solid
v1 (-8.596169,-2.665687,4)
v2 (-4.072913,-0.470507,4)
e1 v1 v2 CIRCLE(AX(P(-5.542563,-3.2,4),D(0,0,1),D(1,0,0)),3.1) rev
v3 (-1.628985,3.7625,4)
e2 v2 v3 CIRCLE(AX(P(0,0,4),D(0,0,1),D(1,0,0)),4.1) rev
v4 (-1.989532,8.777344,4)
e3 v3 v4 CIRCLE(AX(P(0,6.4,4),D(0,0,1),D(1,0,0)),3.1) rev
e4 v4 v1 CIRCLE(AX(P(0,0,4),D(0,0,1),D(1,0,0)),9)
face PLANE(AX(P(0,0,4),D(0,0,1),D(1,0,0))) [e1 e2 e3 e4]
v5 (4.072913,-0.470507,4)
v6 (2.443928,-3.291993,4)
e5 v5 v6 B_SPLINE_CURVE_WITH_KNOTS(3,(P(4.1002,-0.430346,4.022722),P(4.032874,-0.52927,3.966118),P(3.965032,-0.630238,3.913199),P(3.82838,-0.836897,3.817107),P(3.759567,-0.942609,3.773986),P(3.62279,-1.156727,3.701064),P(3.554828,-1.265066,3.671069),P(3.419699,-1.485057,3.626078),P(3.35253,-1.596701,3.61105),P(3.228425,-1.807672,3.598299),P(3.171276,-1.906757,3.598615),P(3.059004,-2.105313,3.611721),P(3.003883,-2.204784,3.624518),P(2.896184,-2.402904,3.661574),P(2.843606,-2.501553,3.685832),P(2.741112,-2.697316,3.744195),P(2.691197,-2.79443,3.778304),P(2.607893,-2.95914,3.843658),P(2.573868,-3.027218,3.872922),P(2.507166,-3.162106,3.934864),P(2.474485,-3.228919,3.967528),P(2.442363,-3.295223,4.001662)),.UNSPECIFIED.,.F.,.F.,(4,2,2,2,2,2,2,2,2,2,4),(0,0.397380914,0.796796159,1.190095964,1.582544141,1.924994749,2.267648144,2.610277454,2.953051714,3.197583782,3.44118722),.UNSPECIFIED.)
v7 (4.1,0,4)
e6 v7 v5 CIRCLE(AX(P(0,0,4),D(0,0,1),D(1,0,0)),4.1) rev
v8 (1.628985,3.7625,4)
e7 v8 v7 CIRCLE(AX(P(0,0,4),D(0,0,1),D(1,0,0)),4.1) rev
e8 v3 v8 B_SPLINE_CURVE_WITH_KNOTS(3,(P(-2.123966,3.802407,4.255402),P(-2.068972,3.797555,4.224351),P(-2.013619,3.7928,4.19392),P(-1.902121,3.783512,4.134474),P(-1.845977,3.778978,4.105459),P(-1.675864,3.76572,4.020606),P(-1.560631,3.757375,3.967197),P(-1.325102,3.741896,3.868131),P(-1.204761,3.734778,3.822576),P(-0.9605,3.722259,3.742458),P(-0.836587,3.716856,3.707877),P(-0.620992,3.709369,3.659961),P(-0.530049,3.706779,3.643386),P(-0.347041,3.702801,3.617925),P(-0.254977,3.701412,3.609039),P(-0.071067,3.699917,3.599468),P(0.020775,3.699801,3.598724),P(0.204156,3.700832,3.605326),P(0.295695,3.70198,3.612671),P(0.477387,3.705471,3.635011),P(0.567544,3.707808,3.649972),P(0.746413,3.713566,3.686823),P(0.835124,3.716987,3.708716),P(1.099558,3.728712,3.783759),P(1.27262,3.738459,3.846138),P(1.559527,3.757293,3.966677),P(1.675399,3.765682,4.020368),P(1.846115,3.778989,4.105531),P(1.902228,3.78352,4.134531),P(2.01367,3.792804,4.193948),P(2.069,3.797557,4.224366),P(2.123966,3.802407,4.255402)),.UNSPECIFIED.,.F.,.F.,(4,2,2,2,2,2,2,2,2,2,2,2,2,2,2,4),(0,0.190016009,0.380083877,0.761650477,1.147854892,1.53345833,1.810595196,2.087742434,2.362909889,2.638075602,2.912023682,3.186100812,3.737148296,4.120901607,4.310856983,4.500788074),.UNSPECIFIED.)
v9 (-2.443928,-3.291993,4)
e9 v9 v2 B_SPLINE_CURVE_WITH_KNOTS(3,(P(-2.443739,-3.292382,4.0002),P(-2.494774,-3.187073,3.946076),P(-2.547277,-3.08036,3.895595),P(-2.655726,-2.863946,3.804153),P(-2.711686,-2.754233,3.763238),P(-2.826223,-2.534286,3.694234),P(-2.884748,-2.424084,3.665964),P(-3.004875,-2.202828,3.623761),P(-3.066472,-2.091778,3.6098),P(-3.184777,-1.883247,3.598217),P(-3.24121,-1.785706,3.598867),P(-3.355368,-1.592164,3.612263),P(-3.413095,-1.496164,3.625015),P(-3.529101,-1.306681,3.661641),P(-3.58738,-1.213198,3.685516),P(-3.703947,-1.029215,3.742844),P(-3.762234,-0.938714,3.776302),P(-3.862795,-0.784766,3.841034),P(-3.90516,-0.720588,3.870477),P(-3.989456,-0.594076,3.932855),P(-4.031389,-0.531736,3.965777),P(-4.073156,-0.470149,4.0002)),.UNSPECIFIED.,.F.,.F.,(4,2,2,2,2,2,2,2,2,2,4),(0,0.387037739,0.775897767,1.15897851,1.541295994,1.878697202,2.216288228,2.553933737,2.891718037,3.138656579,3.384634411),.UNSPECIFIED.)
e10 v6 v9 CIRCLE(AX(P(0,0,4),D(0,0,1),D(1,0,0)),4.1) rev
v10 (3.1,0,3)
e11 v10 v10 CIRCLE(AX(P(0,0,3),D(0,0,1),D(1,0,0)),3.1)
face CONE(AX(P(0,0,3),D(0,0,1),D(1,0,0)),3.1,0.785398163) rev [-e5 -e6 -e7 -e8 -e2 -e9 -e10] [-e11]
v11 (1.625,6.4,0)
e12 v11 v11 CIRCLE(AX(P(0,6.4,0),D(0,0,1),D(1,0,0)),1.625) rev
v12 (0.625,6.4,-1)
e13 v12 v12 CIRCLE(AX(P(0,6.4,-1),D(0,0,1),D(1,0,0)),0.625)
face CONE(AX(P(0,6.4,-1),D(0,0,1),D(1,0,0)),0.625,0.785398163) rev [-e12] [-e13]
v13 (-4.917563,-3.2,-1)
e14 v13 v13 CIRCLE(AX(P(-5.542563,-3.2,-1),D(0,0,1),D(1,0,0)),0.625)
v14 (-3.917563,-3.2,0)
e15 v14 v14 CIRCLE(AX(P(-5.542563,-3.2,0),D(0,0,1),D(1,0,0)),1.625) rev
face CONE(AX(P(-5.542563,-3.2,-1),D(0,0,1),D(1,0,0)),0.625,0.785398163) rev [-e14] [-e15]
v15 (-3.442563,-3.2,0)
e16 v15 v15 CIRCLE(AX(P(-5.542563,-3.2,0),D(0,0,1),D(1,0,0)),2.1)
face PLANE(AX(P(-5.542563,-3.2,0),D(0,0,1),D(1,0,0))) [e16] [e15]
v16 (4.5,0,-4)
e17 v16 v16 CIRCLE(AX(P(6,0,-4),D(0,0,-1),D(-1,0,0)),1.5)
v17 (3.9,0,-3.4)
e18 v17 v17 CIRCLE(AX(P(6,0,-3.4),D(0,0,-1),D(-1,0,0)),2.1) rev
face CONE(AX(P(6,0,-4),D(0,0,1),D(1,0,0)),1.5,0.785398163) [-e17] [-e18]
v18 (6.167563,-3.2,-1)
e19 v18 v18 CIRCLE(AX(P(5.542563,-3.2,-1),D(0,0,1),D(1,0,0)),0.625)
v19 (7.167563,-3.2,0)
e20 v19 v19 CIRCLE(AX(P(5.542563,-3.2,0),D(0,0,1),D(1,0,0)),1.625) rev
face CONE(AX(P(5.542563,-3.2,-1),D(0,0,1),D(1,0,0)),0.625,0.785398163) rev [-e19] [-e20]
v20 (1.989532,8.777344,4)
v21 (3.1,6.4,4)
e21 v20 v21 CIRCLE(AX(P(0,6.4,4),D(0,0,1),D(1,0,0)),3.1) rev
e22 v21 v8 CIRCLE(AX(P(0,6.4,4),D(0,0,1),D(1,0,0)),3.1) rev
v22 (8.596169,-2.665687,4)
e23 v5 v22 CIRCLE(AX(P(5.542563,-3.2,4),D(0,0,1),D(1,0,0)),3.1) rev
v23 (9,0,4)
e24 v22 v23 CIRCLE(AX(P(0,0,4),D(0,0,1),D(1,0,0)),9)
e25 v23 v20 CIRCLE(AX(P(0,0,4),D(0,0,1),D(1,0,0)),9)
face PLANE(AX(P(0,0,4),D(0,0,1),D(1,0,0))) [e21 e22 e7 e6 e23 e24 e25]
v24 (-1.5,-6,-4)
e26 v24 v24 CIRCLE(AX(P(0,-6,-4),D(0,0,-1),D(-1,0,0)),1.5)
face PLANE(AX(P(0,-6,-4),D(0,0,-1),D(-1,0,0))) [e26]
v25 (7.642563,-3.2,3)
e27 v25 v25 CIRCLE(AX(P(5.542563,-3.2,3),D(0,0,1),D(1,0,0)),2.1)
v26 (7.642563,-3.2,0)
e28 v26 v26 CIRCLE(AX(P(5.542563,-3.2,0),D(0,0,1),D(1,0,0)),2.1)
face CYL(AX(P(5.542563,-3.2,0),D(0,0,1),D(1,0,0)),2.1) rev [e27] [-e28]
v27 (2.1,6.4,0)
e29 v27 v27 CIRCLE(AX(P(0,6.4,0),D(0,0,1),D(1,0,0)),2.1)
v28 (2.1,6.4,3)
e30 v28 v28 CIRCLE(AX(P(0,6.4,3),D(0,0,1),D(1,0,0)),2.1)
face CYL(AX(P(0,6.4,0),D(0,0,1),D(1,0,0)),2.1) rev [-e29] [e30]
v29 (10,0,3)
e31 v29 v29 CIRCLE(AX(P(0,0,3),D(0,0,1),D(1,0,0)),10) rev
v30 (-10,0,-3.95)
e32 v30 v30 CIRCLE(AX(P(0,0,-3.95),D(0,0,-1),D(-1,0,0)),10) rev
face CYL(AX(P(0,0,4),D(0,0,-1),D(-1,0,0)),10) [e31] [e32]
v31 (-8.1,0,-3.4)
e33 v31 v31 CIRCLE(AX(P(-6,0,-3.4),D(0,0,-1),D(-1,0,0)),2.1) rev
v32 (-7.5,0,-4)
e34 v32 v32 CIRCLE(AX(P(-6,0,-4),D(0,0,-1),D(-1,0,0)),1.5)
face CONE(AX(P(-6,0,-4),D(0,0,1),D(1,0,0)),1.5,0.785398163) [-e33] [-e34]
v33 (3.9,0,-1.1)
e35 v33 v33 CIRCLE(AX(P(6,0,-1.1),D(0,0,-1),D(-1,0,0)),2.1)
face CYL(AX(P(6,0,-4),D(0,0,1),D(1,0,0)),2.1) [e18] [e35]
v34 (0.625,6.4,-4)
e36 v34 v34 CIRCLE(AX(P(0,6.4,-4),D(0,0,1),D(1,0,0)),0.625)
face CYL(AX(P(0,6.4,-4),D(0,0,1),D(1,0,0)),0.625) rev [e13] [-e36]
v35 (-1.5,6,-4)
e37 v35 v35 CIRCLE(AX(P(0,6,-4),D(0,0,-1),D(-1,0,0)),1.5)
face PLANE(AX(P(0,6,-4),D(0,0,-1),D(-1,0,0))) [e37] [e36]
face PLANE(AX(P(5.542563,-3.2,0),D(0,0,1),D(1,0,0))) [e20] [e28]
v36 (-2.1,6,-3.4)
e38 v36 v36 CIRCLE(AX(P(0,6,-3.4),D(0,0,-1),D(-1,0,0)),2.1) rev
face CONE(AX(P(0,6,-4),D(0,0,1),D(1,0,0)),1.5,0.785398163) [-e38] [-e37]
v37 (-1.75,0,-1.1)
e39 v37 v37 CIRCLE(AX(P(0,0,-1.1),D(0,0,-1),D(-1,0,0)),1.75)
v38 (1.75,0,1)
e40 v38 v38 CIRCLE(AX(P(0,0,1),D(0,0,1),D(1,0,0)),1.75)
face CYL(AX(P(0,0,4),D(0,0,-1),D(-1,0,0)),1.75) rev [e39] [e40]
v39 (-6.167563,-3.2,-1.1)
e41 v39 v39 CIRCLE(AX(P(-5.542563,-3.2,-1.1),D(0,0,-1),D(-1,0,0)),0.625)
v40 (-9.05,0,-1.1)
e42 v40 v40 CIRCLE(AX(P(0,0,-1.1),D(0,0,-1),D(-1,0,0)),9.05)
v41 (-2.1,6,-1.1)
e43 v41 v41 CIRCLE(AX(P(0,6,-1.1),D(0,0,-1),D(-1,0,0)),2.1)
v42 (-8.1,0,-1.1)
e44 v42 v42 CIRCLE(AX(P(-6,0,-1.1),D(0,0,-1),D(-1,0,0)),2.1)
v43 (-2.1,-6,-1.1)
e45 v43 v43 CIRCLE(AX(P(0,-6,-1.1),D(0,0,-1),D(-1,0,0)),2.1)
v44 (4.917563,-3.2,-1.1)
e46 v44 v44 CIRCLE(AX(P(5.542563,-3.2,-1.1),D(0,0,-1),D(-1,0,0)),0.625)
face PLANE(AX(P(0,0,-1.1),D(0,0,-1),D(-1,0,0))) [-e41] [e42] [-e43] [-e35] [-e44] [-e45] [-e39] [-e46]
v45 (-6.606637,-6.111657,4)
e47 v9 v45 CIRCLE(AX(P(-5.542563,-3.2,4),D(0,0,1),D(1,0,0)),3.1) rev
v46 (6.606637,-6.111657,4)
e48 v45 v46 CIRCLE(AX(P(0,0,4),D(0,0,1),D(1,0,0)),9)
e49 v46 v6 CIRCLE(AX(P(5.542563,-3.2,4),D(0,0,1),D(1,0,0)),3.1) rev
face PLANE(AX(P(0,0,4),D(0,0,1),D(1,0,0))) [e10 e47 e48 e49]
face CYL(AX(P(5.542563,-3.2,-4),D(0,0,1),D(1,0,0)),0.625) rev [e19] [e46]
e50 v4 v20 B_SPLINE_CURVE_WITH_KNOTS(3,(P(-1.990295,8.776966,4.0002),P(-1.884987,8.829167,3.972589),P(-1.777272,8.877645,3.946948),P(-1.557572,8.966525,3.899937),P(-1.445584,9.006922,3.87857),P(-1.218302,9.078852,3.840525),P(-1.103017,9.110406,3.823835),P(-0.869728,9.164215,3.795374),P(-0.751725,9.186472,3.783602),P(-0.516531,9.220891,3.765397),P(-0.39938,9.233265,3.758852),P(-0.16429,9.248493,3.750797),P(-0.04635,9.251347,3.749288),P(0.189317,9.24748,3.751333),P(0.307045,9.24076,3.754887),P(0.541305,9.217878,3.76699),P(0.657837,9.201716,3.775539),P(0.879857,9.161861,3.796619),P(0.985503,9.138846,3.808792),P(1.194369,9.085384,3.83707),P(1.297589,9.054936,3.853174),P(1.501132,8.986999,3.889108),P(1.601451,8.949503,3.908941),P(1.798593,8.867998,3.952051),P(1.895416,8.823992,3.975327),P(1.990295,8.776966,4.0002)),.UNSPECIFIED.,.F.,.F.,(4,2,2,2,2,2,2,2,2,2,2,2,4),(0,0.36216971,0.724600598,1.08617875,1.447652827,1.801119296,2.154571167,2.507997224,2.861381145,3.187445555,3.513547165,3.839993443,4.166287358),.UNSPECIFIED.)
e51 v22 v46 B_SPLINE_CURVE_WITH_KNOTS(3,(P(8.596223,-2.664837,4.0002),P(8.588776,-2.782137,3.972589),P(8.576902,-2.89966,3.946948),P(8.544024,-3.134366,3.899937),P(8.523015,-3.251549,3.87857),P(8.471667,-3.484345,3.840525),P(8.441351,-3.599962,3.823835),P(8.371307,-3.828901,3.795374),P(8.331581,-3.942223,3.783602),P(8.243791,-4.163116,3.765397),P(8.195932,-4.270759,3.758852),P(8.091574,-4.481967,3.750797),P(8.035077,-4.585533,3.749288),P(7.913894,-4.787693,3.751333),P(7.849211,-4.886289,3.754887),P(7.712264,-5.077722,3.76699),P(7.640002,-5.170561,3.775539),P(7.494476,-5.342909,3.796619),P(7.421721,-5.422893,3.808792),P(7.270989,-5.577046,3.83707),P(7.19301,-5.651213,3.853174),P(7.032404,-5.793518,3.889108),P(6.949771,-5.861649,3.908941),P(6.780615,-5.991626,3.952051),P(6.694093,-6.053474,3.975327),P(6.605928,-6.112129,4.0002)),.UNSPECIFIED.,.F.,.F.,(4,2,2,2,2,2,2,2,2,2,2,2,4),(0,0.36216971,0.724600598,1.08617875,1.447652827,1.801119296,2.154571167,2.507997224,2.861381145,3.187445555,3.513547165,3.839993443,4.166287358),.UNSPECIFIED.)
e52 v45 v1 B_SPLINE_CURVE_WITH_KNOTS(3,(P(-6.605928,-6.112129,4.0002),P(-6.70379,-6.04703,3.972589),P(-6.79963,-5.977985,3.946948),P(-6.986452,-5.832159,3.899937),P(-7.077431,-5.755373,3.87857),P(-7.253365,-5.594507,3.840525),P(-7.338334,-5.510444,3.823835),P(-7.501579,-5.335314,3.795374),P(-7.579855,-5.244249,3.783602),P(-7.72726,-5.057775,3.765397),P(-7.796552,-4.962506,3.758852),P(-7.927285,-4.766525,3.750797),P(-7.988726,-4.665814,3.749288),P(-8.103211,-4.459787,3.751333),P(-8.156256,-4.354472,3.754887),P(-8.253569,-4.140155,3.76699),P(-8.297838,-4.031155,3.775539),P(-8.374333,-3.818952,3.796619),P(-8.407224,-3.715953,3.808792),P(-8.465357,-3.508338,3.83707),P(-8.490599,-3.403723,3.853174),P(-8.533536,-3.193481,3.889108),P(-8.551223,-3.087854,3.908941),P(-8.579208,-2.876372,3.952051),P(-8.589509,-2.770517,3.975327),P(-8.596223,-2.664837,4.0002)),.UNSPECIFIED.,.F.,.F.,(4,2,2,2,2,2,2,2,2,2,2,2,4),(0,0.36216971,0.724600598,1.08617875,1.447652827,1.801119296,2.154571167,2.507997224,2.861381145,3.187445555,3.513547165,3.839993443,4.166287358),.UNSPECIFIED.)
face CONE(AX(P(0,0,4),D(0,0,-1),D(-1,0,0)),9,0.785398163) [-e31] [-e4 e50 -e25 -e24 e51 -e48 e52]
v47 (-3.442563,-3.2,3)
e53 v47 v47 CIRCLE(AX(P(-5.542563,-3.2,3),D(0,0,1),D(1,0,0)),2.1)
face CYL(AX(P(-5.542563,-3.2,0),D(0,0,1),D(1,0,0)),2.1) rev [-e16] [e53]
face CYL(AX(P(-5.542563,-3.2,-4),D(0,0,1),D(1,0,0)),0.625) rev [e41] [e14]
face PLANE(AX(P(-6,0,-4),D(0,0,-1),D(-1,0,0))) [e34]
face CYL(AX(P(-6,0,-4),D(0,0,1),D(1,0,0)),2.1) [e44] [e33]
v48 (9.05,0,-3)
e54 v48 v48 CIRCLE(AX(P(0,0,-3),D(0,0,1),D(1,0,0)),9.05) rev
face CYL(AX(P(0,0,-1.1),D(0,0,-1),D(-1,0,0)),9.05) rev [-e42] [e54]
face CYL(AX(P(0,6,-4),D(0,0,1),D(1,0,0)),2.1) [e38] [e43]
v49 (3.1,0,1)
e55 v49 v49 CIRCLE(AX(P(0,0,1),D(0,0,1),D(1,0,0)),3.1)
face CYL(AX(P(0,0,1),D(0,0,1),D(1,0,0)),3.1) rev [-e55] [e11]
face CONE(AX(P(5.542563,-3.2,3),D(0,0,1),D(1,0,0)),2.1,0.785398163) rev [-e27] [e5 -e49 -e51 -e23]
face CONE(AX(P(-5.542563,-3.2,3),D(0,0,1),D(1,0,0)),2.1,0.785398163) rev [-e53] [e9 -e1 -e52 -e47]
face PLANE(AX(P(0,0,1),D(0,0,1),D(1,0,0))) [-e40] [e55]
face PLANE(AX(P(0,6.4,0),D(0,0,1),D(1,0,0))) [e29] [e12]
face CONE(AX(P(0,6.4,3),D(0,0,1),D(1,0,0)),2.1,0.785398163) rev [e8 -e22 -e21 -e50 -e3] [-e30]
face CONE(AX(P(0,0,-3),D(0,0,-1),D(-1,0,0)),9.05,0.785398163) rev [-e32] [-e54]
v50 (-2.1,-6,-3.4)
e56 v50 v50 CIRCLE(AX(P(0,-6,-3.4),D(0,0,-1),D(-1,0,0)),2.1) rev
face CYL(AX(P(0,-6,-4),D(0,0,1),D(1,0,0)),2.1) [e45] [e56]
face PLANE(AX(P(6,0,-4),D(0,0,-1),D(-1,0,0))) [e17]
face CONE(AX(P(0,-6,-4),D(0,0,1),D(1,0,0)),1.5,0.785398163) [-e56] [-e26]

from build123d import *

# Parameters (mm, degrees)
SKETCH1_R                = 10
SKETCH1_R_2              = 2.1
SKETCH1_R_3              = 1.75
BOSS_EXTRUDE1_DEPTH      = 4
SKETCH2_R                = 9.05
CUT_EXTRUDE1_DEPTH       = 2.9
CHAMFER1_SIZE            = 1
BOSS_EXTRUDE2_DEPTH      = 2.9
BOSS_EXTRUDE2_DEPTH_BACK = 5.1
SKETCH3_R                = 2.1
CHAMFER2_SIZE            = 0.6
SKETCH4_R                = 3.1
CUT_EXTRUDE2_DEPTH       = 3
SKETCH5_R                = 2.1
CUT_EXTRUDE3_DEPTH       = 4
SKETCH6_R                = 0.625
CUT_EXTRUDE4_DEPTH       = 15.696938457
CIRPATTERN1_COUNT        = 3
CHAMFER3_SIZE            = 1
CHAMFER4_SIZE            = 1


with BuildPart() as part:
    # Sketch1 → Boss-Extrude1 (new, symmetric)
    with BuildSketch(Plane.XY):
        Circle(SKETCH1_R)
        with Locations((6, 0)):
            Circle(SKETCH1_R_2, mode=Mode.SUBTRACT)
        Circle(SKETCH1_R_3, mode=Mode.SUBTRACT)
        with Locations((0, -6)):
            Circle(SKETCH1_R_2, mode=Mode.SUBTRACT)
        with Locations((-6, 0)):
            Circle(SKETCH1_R_2, mode=Mode.SUBTRACT)
        with Locations((0, 6)):
            Circle(SKETCH1_R_2, mode=Mode.SUBTRACT)
    extrude(amount=BOSS_EXTRUDE1_DEPTH, both=True)

    # Sketch2 → Cut-Extrude1 (cut)
    with BuildSketch(Plane(origin=(0, 0, -4), x_dir=(-1, 0, 0), z_dir=(0, 0, -1))):
        Circle(SKETCH2_R)
    extrude(amount=-CUT_EXTRUDE1_DEPTH, mode=Mode.SUBTRACT)

    # Chamfer1
    # the kernel refuses this chamfer: 1 mm, written as the material it takes off along each edge
    with BuildSketch(Plane(origin=(0, 0, -4), x_dir=(-1, 0, 0), z_dir=(0, -1, 0))) as chamfer1_piece_1:
        Polygon((9.05 + CHAMFER1_SIZE, 0), (9.05, -CHAMFER1_SIZE), (9.05, 0), align=None)
    revolve(axis=Axis((0, 0, -4), (0, 0, -1)), mode=Mode.SUBTRACT)

    # Sketch3 → Boss-Extrude2 (add, two sides: drawn at the far end of the back side and taken through both)
    with BuildSketch(Plane(origin=(0, 0, -1.1), x_dir=(-1, 0, 0), z_dir=(0, 0, -1)).offset(-BOSS_EXTRUDE2_DEPTH_BACK)):
        with Locations((-6, 0)):
            Circle(SKETCH3_R)
        with Locations((0, -6)):
            Circle(SKETCH3_R)
        with Locations((6, 0)):
            Circle(SKETCH3_R)
        with Locations((0, 6)):
            Circle(SKETCH3_R)
    extrude(amount=BOSS_EXTRUDE2_DEPTH + BOSS_EXTRUDE2_DEPTH_BACK)

    # Chamfer2
    chamfer2_edges = [part.edges().sort_by_distance(p)[0] for p in [
        (8.1, 0, -4),
        (2.1, -6, -4),
        (-3.9, 0, -4),
        (2.1, 6, -4),
    ]]
    chamfer(chamfer2_edges, length=CHAMFER2_SIZE)

    # Sketch4 → Cut-Extrude2 (cut)
    with BuildSketch(Plane.XY.offset(4)):
        Circle(SKETCH4_R)
    extrude(amount=-CUT_EXTRUDE2_DEPTH, mode=Mode.SUBTRACT)

    # Sketch5 → Cut-Extrude3 (cut)
    with BuildSketch(Plane.XY.offset(4)):
        with Locations((0, 6.4)):
            Circle(SKETCH5_R)
        with Locations((5.542562584, -3.2)):
            Circle(SKETCH5_R)
        with Locations((-5.542562584, -3.2)):
            Circle(SKETCH5_R)
    extrude(amount=-CUT_EXTRUDE3_DEPTH, mode=Mode.SUBTRACT)

    # Sketch6 → Cut-Extrude4 (cut, through all)
    with BuildSketch(Plane.XY):
        with Locations((0, 6.4)):
            Circle(SKETCH6_R)
    cut_extrude4 = extrude(amount=-CUT_EXTRUDE4_DEPTH, mode=Mode.SUBTRACT)

    # CirPattern1: Cut-Extrude4 ×3 about axis
    cirpattern1_axis = Axis((0, 0, 0), (0, 0, 1))
    for i in range(1, CIRPATTERN1_COUNT):
        add(cut_extrude4.rotate(cirpattern1_axis, i * 360 / CIRPATTERN1_COUNT), mode=Mode.SUBTRACT)

    # Chamfer3
    chamfer3_edges = [part.edges().sort_by_distance(p)[0] for p in [
        (-0.625, 6.4, 0),
        (5.855062584, -2.658734123, 0),
        (-5.230062584, -3.741265877, 0),
    ]]
    chamfer(chamfer3_edges, length=CHAMFER3_SIZE)

    # Chamfer4
    # the kernel refuses this chamfer: 1 mm, written as the material it takes off along each edge
    with BuildSketch(Plane(origin=(0, 6.4, 4), x_dir=(1, 0, 0), z_dir=(0, -1, 0))) as chamfer4_piece_1:
        Polygon((2.1 + CHAMFER4_SIZE, 0), (2.1, -CHAMFER4_SIZE), (2.1, 0), align=None)
    revolve(axis=Axis((0, 6.4, 4), (0, 0, 1)), mode=Mode.SUBTRACT)
    with BuildSketch(Plane(origin=(5.542562584, -3.2, 4), x_dir=(1, 0, 0), z_dir=(0, -1, 0))) as chamfer4_piece_2:
        Polygon((2.1, -CHAMFER4_SIZE), (2.1 + CHAMFER4_SIZE, 0), (2.1, 0), align=None)
    revolve(axis=Axis((5.542562584, -3.2, 4), (0, 0, 1)), mode=Mode.SUBTRACT)
    with BuildSketch(Plane(origin=(-5.542562584, -3.2, 4), x_dir=(1, 0, 0), z_dir=(0, -1, 0))) as chamfer4_piece_3:
        Polygon((2.1 + CHAMFER4_SIZE, 0), (2.1, -CHAMFER4_SIZE), (2.1, 0), align=None)
    revolve(axis=Axis((-5.542562584, -3.2, 4), (0, 0, 1)), mode=Mode.SUBTRACT)
    with BuildSketch(Plane(origin=(0, 0, 4), x_dir=(1, 0, 0), z_dir=(0, -1, 0))) as chamfer4_piece_4:
        Polygon((10 - CHAMFER4_SIZE, 0), (10, -CHAMFER4_SIZE), (10, 0), align=None)
    revolve(axis=Axis((0, 0, 4), (0, 0, 1)), mode=Mode.SUBTRACT)
    with BuildSketch(Plane(origin=(0, 0, 4), x_dir=(1, 0, 0), z_dir=(0, -1, 0))) as chamfer4_piece_5:
        Polygon((3.1 + CHAMFER4_SIZE, 0), (3.1, -CHAMFER4_SIZE), (3.1, 0), align=None)
    revolve(axis=Axis((0, 0, 4), (0, 0, 1)), mode=Mode.SUBTRACT)


solid = part.part
